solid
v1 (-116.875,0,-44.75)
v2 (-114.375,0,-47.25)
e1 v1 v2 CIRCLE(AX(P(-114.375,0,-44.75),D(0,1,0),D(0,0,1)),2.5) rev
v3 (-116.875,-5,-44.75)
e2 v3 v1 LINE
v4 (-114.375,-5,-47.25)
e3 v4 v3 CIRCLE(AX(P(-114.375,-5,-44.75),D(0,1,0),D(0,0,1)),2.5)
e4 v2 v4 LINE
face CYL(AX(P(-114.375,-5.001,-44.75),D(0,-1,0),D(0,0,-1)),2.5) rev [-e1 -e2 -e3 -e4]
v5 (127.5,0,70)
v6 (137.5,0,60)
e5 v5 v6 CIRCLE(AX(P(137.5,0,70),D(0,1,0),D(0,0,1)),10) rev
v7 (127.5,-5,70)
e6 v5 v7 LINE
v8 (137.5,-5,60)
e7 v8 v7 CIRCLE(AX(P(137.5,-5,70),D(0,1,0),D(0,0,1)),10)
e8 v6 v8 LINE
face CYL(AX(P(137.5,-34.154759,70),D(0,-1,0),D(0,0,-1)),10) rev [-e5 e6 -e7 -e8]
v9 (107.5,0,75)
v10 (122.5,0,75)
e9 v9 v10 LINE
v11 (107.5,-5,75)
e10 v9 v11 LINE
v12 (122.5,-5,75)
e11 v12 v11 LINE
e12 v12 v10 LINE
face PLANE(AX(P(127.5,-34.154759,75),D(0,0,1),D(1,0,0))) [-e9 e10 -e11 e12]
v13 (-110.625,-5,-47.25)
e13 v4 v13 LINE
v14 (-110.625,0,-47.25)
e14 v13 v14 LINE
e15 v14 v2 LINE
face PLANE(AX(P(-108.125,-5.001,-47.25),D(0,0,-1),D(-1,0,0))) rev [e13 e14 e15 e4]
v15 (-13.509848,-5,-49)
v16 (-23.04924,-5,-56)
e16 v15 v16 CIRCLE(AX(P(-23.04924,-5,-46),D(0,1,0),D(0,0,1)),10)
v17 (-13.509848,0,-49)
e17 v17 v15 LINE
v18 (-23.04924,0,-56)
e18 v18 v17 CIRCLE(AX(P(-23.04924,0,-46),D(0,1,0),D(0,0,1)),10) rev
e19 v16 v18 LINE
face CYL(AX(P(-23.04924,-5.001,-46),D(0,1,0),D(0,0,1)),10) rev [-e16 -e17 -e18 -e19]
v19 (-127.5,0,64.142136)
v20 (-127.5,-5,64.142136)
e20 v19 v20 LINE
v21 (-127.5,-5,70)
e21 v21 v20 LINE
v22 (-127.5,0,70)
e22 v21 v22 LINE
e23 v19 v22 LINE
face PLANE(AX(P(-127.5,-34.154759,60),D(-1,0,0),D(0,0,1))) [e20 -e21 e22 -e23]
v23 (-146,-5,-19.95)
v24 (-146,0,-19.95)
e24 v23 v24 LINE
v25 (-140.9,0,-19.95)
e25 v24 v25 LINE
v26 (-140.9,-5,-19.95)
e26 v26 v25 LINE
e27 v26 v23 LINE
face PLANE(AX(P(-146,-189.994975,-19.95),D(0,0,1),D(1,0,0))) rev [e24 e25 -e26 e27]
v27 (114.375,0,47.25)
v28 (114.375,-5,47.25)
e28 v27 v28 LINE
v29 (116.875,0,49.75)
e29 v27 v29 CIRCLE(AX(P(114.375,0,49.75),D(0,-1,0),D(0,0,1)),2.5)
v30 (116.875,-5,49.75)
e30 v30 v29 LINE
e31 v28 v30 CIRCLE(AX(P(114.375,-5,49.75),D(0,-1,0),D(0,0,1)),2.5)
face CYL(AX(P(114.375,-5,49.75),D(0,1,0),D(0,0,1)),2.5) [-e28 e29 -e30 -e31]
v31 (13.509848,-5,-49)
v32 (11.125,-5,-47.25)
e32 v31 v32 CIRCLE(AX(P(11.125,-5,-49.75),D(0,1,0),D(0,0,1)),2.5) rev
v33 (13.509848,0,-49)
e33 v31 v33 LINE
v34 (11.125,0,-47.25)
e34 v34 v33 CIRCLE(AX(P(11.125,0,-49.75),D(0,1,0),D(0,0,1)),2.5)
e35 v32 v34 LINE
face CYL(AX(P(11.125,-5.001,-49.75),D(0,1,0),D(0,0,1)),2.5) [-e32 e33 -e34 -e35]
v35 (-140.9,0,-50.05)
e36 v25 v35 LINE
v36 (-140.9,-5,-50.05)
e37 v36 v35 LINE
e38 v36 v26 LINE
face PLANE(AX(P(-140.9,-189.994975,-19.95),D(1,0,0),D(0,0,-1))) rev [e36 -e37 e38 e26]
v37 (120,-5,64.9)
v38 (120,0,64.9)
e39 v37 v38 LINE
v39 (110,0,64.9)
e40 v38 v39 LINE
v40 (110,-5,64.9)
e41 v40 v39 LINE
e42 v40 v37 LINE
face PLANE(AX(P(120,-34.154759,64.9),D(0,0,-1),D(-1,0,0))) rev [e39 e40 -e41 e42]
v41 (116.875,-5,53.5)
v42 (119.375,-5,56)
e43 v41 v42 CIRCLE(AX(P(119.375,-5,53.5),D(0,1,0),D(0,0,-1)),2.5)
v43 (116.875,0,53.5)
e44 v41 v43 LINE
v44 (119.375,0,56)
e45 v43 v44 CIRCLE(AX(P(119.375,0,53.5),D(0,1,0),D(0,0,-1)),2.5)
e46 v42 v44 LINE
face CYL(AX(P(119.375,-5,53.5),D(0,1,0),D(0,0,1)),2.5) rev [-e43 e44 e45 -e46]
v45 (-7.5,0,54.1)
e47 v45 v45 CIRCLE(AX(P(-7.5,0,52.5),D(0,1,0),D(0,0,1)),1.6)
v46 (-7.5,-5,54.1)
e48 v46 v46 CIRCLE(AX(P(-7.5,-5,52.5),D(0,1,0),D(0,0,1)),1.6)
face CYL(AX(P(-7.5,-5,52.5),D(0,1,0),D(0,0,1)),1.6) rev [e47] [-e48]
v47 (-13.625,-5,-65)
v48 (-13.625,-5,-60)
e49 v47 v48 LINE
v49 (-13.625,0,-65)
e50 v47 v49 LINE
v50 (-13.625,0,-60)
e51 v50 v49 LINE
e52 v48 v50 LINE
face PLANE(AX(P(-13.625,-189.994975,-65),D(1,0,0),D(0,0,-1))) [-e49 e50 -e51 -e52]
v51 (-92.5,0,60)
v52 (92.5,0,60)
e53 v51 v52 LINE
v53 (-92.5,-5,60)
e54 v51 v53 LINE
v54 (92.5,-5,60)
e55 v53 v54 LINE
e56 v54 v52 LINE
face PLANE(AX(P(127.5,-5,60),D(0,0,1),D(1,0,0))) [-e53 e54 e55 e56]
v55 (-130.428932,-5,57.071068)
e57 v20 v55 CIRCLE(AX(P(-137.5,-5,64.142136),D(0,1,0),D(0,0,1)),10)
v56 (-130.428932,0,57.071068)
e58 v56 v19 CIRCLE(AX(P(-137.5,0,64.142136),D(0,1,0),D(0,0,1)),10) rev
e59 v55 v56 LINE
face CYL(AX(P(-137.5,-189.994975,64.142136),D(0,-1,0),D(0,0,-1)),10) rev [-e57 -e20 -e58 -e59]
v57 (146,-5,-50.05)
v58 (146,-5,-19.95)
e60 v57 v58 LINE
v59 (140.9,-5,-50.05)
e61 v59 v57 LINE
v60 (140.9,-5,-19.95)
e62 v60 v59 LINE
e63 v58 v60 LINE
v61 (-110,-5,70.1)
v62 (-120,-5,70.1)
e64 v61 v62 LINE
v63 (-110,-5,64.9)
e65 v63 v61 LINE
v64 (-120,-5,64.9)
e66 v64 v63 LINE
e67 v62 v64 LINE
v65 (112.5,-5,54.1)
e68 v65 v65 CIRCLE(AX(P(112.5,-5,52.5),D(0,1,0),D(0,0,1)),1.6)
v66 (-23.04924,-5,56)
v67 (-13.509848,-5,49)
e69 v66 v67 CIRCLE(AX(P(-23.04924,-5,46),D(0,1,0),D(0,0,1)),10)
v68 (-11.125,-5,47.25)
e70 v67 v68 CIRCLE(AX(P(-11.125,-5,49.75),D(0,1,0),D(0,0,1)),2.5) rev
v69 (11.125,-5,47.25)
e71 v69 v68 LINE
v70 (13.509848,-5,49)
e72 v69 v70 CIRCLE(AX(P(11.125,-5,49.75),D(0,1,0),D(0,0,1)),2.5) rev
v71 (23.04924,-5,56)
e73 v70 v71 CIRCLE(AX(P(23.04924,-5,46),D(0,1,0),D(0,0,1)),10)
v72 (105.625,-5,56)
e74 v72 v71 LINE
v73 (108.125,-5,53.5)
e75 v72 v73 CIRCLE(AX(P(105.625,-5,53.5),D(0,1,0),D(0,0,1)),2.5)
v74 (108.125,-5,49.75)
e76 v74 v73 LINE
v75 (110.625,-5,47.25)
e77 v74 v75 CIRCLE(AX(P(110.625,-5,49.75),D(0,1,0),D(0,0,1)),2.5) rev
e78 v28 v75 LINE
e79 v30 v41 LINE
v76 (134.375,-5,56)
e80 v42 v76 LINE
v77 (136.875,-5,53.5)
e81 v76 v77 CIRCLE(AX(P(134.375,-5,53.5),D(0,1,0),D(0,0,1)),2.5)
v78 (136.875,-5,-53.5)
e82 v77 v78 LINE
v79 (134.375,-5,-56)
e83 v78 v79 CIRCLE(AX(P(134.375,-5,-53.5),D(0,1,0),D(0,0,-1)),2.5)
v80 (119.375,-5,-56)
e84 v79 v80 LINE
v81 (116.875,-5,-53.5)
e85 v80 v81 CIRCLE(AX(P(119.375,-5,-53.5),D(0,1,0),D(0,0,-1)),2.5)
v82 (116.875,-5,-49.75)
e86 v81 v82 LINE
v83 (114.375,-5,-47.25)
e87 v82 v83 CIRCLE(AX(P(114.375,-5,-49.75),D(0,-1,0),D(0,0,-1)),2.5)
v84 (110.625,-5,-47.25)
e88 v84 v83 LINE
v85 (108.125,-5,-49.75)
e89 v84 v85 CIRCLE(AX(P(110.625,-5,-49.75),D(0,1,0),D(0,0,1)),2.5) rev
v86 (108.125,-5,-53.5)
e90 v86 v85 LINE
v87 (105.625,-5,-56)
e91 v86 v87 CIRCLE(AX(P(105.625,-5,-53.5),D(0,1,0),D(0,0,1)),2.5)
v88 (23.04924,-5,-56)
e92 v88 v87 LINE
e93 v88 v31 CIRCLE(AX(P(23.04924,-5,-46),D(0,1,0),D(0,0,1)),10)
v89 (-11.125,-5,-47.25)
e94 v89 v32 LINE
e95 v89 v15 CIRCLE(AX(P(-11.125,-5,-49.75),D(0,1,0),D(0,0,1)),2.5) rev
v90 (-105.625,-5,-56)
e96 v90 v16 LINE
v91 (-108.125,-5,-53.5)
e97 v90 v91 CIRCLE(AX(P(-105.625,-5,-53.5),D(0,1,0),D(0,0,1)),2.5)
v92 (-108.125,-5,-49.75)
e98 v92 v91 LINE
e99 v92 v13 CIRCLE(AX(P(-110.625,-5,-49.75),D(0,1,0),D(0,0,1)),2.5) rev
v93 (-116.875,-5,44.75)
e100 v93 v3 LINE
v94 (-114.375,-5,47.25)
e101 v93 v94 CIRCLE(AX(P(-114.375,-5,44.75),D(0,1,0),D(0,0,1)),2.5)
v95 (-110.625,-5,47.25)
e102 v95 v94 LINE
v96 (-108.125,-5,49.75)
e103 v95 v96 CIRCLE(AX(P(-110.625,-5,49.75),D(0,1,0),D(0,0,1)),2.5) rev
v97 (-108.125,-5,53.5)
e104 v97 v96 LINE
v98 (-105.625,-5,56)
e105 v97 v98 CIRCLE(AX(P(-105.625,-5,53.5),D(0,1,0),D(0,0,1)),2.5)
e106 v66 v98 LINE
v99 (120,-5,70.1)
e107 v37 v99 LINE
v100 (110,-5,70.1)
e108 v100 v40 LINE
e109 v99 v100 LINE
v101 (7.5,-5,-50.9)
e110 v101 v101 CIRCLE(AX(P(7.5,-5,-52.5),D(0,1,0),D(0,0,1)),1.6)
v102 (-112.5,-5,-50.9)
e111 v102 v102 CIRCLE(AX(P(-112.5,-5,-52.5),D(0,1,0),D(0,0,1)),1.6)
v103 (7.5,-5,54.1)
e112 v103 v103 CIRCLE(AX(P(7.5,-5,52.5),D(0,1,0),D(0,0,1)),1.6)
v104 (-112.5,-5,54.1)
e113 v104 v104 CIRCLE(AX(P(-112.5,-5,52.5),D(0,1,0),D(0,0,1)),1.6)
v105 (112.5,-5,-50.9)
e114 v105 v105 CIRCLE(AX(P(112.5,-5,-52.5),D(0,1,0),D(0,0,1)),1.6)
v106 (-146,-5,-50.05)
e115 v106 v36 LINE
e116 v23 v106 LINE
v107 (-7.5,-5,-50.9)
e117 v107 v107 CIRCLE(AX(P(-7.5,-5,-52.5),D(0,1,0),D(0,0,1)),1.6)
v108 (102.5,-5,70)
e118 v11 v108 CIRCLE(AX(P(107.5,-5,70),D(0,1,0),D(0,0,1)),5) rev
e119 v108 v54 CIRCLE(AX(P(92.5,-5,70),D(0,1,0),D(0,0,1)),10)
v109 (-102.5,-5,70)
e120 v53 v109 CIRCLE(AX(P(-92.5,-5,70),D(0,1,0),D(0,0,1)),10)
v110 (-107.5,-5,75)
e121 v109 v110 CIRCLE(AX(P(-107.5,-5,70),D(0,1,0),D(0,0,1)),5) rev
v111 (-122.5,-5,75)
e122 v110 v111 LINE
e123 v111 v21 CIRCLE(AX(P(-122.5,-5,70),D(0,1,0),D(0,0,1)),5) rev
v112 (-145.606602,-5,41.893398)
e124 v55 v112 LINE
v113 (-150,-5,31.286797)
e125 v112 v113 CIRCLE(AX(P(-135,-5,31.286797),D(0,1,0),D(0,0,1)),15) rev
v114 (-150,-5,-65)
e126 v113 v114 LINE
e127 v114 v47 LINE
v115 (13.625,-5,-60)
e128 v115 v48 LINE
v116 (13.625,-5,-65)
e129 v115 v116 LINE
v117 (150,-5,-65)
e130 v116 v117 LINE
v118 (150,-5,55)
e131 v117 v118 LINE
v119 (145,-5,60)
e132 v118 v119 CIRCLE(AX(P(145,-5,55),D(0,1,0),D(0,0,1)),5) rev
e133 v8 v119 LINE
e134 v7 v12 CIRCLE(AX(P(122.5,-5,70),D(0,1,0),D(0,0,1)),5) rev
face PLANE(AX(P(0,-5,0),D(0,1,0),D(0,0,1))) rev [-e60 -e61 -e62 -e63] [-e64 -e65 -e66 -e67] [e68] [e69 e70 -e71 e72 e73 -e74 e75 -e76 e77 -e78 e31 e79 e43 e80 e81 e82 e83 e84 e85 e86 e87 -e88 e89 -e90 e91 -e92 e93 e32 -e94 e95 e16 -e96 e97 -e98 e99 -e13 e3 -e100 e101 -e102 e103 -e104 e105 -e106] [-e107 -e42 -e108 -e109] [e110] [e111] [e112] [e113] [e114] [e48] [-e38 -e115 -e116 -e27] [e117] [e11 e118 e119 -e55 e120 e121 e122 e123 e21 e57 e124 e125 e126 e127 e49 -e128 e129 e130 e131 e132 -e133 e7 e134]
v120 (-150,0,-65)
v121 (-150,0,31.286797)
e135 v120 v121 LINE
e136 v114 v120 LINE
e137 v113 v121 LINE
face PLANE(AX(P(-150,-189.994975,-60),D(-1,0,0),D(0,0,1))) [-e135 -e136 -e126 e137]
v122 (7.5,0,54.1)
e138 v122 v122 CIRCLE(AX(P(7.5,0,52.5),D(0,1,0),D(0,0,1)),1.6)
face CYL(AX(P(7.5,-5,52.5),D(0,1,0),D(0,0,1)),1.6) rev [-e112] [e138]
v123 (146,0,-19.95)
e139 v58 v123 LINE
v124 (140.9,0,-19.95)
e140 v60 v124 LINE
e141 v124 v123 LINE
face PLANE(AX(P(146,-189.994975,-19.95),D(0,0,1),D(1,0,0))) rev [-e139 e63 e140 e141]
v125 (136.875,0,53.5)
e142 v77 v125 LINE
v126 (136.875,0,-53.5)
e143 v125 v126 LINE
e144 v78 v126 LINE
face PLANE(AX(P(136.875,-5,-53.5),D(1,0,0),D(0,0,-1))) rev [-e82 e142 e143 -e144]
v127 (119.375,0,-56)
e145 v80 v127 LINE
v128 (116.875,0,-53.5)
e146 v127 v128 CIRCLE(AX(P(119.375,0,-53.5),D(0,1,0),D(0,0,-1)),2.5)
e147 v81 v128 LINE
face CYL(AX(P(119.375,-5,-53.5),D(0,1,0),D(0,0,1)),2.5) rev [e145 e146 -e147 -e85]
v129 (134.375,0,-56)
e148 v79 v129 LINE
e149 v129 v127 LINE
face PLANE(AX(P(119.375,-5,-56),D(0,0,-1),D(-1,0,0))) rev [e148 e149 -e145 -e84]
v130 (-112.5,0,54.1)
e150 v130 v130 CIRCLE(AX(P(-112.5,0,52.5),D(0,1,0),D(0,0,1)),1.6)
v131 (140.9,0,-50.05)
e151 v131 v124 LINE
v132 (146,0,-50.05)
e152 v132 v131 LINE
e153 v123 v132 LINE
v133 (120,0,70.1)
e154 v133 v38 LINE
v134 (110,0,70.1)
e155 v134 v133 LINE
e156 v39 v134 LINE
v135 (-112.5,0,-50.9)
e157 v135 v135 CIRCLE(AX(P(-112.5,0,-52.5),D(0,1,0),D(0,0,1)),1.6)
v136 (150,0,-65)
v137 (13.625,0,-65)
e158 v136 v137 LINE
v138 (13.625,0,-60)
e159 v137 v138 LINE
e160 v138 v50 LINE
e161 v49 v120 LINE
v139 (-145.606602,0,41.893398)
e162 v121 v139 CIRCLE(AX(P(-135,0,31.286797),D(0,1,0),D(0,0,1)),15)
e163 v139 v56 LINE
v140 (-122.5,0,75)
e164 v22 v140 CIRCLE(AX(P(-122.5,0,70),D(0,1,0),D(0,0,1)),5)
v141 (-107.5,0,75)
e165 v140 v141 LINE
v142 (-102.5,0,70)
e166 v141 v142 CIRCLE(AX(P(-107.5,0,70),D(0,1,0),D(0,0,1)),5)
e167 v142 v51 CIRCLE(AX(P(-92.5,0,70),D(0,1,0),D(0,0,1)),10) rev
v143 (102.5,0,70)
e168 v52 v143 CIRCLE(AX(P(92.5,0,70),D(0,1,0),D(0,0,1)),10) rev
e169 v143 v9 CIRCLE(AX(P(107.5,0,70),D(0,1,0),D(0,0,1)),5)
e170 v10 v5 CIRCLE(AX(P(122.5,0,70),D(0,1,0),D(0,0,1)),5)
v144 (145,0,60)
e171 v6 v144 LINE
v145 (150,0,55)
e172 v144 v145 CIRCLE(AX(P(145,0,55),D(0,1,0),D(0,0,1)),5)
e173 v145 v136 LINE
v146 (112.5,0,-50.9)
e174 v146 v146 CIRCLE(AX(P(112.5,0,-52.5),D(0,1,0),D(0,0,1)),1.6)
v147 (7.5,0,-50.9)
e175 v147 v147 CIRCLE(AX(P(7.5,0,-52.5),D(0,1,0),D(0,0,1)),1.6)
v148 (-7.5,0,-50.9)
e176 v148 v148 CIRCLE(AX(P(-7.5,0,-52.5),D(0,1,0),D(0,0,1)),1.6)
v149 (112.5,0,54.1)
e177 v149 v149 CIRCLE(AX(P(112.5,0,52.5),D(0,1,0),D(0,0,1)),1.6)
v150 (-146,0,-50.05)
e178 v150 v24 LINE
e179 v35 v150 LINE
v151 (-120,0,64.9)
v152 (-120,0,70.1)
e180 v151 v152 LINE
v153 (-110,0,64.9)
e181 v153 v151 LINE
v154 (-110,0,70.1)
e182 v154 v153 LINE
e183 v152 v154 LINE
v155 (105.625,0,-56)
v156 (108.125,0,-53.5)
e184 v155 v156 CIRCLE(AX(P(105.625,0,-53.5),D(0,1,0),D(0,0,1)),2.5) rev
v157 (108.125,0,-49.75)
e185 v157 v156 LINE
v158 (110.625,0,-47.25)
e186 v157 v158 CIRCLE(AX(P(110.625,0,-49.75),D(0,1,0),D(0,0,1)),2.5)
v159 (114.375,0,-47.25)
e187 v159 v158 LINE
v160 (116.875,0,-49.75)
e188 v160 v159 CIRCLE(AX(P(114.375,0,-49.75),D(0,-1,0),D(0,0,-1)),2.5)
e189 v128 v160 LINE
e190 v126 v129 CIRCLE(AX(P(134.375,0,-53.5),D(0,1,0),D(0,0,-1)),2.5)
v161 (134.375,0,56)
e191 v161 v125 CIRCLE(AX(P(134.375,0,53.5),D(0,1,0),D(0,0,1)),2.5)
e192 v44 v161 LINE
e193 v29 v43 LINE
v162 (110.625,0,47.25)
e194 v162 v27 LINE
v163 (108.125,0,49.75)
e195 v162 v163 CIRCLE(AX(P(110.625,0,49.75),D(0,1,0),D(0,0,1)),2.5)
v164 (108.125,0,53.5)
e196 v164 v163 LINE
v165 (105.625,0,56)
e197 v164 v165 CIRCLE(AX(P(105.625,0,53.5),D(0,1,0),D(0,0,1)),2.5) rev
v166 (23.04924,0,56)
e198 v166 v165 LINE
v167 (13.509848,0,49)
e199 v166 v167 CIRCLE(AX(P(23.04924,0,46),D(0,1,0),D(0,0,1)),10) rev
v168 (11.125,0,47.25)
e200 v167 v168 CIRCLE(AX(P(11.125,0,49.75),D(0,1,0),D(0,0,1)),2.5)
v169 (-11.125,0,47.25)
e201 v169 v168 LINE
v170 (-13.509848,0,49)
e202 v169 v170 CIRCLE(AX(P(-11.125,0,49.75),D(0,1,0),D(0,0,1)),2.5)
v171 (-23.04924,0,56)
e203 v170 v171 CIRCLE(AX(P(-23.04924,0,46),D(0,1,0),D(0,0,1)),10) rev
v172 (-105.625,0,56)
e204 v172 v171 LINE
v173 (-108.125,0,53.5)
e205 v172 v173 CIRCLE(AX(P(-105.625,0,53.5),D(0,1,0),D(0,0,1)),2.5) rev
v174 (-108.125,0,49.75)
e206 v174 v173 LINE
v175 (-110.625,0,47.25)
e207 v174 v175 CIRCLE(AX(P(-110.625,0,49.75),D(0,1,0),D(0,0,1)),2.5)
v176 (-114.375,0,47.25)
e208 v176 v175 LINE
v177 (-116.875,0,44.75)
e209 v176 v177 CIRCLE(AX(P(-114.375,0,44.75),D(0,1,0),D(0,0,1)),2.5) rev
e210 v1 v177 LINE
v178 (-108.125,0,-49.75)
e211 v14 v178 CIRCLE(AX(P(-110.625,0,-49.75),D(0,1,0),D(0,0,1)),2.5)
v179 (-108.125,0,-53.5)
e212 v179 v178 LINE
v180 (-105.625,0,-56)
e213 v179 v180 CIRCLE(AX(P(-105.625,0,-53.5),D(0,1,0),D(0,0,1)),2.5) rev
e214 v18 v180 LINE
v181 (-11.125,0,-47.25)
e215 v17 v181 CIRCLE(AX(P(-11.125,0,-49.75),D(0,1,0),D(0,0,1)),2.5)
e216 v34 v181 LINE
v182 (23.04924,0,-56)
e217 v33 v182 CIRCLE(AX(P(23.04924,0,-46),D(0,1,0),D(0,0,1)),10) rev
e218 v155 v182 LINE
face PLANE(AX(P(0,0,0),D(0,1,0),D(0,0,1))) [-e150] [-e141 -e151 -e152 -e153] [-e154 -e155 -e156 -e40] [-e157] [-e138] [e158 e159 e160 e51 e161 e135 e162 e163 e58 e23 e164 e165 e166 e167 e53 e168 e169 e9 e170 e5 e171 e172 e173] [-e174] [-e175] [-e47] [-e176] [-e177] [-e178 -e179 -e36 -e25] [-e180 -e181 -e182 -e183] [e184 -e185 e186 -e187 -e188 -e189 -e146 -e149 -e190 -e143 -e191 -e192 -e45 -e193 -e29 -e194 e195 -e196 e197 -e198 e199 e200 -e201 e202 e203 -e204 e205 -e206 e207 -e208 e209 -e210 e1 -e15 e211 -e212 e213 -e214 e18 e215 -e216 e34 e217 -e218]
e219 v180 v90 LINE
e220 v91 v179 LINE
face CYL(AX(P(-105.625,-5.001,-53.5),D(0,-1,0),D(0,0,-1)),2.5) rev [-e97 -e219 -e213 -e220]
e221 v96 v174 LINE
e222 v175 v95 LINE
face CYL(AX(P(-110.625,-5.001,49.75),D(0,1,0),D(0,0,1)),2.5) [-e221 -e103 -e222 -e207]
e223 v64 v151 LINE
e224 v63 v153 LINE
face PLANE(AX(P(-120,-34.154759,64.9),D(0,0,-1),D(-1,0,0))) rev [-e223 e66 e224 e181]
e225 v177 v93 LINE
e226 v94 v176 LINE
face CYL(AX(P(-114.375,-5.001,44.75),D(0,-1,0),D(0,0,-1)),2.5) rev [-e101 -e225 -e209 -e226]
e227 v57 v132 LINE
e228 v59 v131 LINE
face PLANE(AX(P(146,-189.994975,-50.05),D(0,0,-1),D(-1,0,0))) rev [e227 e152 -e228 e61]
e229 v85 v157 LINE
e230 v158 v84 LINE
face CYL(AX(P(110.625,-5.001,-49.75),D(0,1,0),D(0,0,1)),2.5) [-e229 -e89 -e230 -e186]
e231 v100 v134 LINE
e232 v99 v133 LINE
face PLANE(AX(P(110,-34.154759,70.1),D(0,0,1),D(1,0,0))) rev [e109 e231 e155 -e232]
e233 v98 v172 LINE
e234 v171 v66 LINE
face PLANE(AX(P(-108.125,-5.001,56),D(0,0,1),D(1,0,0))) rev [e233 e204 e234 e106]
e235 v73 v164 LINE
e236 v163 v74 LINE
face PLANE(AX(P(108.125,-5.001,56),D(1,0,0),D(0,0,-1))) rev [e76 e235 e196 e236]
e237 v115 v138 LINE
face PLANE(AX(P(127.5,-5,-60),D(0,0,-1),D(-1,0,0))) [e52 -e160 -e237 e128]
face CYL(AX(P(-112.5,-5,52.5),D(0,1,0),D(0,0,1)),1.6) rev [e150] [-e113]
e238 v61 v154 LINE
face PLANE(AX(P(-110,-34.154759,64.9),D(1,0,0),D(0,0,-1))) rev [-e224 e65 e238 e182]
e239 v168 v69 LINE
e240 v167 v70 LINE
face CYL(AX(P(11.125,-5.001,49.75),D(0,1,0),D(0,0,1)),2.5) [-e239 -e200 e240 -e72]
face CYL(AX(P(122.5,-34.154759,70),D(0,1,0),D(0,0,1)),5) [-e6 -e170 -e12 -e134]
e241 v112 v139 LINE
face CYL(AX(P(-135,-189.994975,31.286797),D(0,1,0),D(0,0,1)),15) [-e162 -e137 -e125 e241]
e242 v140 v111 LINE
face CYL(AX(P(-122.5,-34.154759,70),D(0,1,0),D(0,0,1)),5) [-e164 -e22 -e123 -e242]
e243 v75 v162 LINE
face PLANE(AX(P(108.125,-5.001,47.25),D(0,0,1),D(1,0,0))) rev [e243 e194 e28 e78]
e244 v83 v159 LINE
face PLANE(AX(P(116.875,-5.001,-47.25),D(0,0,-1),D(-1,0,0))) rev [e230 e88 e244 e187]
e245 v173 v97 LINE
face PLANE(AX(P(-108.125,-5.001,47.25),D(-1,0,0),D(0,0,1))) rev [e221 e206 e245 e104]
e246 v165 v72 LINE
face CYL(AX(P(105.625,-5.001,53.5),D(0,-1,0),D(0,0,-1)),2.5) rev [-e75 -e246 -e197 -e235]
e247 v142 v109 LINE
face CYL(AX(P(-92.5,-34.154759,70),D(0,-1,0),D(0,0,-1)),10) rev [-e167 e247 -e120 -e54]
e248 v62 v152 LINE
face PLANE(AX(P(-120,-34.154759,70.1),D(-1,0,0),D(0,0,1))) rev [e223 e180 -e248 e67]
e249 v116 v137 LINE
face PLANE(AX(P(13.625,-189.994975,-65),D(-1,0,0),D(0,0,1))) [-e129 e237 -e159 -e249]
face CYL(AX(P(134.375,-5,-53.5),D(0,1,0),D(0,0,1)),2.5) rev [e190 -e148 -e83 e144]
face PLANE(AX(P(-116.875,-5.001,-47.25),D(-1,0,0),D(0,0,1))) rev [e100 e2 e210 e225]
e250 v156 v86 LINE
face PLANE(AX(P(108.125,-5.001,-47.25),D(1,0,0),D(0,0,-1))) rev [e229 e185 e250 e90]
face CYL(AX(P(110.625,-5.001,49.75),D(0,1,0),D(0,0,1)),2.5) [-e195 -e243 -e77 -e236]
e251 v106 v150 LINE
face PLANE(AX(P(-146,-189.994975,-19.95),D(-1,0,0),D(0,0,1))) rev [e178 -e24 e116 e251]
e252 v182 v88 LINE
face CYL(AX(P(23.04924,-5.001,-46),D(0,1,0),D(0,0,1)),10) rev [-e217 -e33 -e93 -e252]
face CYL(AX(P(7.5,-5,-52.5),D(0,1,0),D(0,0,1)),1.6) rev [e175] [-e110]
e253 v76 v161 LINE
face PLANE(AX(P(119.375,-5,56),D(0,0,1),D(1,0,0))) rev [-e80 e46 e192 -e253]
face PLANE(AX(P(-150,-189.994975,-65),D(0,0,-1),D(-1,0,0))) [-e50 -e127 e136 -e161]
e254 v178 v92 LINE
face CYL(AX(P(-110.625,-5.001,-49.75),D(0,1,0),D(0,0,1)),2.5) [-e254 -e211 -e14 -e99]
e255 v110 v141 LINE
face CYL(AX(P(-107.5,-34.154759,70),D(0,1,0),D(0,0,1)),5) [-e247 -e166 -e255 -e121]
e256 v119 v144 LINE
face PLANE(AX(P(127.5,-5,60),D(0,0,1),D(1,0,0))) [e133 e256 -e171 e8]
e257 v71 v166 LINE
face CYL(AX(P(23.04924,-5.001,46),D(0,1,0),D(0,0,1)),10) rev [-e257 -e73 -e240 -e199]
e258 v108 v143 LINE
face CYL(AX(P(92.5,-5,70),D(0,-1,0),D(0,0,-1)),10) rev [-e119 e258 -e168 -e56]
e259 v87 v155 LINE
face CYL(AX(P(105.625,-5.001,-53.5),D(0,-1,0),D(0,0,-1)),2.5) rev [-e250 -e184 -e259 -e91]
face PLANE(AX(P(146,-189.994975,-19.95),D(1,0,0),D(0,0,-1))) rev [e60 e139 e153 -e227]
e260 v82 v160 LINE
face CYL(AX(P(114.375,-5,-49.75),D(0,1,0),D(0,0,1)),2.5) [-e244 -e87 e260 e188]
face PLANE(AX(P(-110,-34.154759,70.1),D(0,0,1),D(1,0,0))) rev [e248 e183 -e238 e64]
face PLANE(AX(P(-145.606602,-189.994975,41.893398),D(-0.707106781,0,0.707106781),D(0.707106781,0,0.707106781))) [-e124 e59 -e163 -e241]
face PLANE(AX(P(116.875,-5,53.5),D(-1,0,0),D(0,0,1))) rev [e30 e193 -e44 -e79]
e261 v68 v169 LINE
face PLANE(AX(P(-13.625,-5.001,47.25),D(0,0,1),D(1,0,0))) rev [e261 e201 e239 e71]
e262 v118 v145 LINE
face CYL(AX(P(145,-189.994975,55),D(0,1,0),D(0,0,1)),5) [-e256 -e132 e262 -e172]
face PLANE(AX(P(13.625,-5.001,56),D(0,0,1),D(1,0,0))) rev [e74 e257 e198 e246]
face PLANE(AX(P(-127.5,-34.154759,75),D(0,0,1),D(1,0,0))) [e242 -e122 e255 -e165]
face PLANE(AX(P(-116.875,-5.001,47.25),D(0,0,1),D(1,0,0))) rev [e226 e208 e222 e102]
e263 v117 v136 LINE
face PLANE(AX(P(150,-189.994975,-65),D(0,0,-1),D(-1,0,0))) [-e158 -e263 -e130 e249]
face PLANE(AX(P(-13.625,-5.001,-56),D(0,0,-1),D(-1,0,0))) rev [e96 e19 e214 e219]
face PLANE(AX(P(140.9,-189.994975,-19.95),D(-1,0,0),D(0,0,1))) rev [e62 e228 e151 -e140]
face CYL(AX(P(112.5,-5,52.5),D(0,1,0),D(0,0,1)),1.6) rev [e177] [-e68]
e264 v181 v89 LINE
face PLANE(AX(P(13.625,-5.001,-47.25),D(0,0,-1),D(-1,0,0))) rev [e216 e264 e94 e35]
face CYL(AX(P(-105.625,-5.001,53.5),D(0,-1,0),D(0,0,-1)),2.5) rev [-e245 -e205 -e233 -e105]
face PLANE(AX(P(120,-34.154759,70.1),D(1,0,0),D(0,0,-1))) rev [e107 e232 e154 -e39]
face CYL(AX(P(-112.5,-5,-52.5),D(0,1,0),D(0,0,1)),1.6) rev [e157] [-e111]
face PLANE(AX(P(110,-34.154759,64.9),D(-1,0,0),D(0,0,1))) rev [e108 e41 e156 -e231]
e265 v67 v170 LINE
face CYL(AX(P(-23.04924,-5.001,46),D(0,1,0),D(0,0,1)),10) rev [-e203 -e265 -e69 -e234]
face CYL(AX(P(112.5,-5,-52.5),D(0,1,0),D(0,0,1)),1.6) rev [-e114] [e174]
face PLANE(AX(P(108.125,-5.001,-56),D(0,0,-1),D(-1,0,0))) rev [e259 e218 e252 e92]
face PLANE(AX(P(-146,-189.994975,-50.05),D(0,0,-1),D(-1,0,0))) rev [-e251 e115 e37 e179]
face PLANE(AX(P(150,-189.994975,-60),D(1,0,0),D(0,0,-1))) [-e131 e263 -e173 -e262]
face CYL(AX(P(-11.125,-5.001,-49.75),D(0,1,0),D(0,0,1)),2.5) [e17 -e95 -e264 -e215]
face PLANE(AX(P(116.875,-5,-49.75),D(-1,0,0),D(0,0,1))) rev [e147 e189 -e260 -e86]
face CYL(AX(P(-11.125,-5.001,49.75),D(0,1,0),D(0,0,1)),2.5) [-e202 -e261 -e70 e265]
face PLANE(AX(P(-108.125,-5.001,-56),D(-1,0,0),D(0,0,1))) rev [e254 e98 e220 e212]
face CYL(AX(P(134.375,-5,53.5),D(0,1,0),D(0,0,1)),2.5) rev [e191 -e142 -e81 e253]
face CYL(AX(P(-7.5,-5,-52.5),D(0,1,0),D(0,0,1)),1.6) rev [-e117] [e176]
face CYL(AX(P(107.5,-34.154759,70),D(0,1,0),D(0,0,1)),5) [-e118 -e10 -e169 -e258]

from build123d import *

# Parameters (mm, degrees)
SKETCH1_W           = 255
SKETCH1_H           = 120
SKETCH1_R           = 1.6
BASE_FLANGE1_DEPTH  = 5
CUT_EXTRUDE1_REACH  = 143.001
SKETCH9_W           = 5.1
SKETCH9_H           = 30.1
BOSS_EXTRUDE1_DEPTH = 5
SKETCH10_W          = 25
SKETCH10_H          = 15
SKETCH10_W_2        = 10
SKETCH10_H_2        = 5.2
BOSS_EXTRUDE2_DEPTH = 5
FILLET1_R           = 5
FILLET2_R           = 2.5
FILLET3_R           = 10
CUT_EXTRUDE2_DEPTH  = 168.779617356


# Sheet-metal steps are written as plain solids
with BuildPart() as part:
    # Sketch1 → Base-Flange1 (new body)
    with BuildSketch(Plane(origin=(0, 0, 0), x_dir=(1, 0, 0), z_dir=(0, 1, 0))):
        Rectangle(SKETCH1_W, SKETCH1_H)
        with Locations(Location((-112.5, 52.5, 0), (0, 0, 270))):
            Circle(SKETCH1_R, mode=Mode.SUBTRACT)
        with Locations(Location((-112.5, -52.5, 0), (0, 0, 270))):
            Circle(SKETCH1_R, mode=Mode.SUBTRACT)
        with Locations(Location((-7.5, -52.5, 0), (0, 0, 270))):
            Circle(SKETCH1_R, mode=Mode.SUBTRACT)
        with Locations(Location((-7.5, 52.5, 0), (0, 0, 270))):
            Circle(SKETCH1_R, mode=Mode.SUBTRACT)
        with Locations(Location((7.5, 52.5, 0), (0, 0, 270))):
            Circle(SKETCH1_R, mode=Mode.SUBTRACT)
        with Locations(Location((112.5, 52.5, 0), (0, 0, 270))):
            Circle(SKETCH1_R, mode=Mode.SUBTRACT)
        with Locations(Location((112.5, -52.5, 0), (0, 0, 270))):
            Circle(SKETCH1_R, mode=Mode.SUBTRACT)
        with Locations(Location((7.5, -52.5, 0), (0, 0, 270))):
            Circle(SKETCH1_R, mode=Mode.SUBTRACT)
    extrude(amount=-BASE_FLANGE1_DEPTH)

    # Sketch6 → Cut-Extrude1 (cut, up to next)
    with BuildSketch(Plane(origin=(0, 0, 0), x_dir=(1, 0, 0), z_dir=(0, 1, 0)), mode=Mode.PRIVATE) as cut_extrude1_sk1:
        Polygon((-108.125, 56), (-108.125, 47.25), (-116.875, 47.25), (-116.875, -47.25), (-108.125, -47.25), (-108.125, -56), (-13.625, -56), (-13.625, -47.25), (13.625, -47.25), (13.625, -56), (108.125, -56), (108.125, -47.25), (116.875, -47.25), (116.875, 47.25), (108.125, 47.25), (108.125, 56), (13.625, 56), (13.625, 47.25), (-13.625, 47.25), (-13.625, 56), align=None)
    cut_extrude1_tool1 = extrude(cut_extrude1_sk1.sketch, amount=-CUT_EXTRUDE1_REACH, mode=Mode.PRIVATE) & part.part
    add(cut_extrude1_tool1.solids().sort_by_distance((0, 0, 0))[0], mode=Mode.SUBTRACT)

    # Sketch9 → Boss-Extrude1 (add)
    # profile 1 of 2: a face of its own
    with BuildSketch(Plane(origin=(0, 0, 0), x_dir=(1, 0, 0), z_dir=(0, 1, 0))):
        with BuildLine():
            Line((-150, 60), (-150, -31.286796564))
            ThreePointArc((-150, -31.286796564), (-148.858192988, -37.02704805), (-145.606601718, -41.893398282))
            Line((-145.606601718, -41.893398282), (-127.5, -60))
            Line((-127.5, -60), (-127.5, 60))
            Line((-127.5, 60), (-13.625, 60))
            Line((-13.625, 60), (-13.625, 65))
            Line((-13.625, 65), (-150, 65))
            Line((-150, 65), (-150, 60))
        make_face()
        with Locations((-143.45, 35)):
            Rectangle(SKETCH9_W, SKETCH9_H, mode=Mode.SUBTRACT)
    # profile 2 of 2: a face of its own
    with BuildSketch(Plane(origin=(0, 0, 0), x_dir=(1, 0, 0), z_dir=(0, 1, 0))):
        with BuildLine():
            Line((127.5, 60), (127.5, -60))
            Line((127.5, -60), (145, -60))
            ThreePointArc((145, -60), (148.535533906, -58.535533906), (150, -55))
            Line((150, -55), (150, 60))
            Line((150, 60), (150, 65))
            Line((150, 65), (13.625, 65))
            Line((13.625, 65), (13.625, 60))
            Line((13.625, 60), (127.5, 60))
        make_face()
        with Locations((143.45, 35)):
            Rectangle(SKETCH9_W, SKETCH9_H, mode=Mode.SUBTRACT)
    extrude(amount=-BOSS_EXTRUDE1_DEPTH)

    # Sketch10 → Boss-Extrude2 (add)
    # profile 1 of 2: a face of its own
    with BuildSketch(Plane(origin=(0, 0, 0), x_dir=(1, 0, 0), z_dir=(0, 1, 0))):
        with Locations((115, -67.5)):
            Rectangle(SKETCH10_W, SKETCH10_H)
        with Locations((115, -67.5)):
            Rectangle(SKETCH10_W_2, SKETCH10_H_2, mode=Mode.SUBTRACT)
    # profile 2 of 2: a face of its own
    with BuildSketch(Plane(origin=(0, 0, 0), x_dir=(1, 0, 0), z_dir=(0, 1, 0))):
        with Locations((-115, -67.5)):
            Rectangle(SKETCH10_W, SKETCH10_H)
        with Locations((-115, -67.5)):
            Rectangle(SKETCH10_W_2, SKETCH10_H_2, mode=Mode.SUBTRACT)
    extrude(amount=-BOSS_EXTRUDE2_DEPTH)

    # Fillet1
    fillet1_edges = [part.edges().sort_by_distance(p)[0] for p in [
        (102.5, -2.5, 75),
        (127.5, -2.5, 75),
        (-127.5, -2.5, 75),
        (-102.5, -2.5, 75),
    ]]
    fillet(fillet1_edges, radius=FILLET1_R)

    # Fillet2
    fillet2_edges = [part.edges().sort_by_distance(p)[0] for p in [
        (-108.125, -2.5, -56),
        (-13.625, -2.5, -47.25),
        (13.625, -2.5, -47.25),
        (108.125, -2.5, -56),
        (108.125, -2.5, -47.25),
        (116.875, -2.5, -47.25),
        (116.875, -2.5, 47.25),
        (108.125, -2.5, 47.25),
        (108.125, -2.5, 56),
        (13.625, -2.5, 47.25),
        (-13.625, -2.5, 47.25),
        (-108.125, -2.5, 56),
        (-108.125, -2.5, 47.25),
        (-116.875, -2.5, 47.25),
        (-116.875, -2.5, -47.25),
        (-108.125, -2.5, -47.25),
    ]]
    fillet(fillet2_edges, radius=FILLET2_R)

    # Fillet3
    # the kernel refuses this fillet: 10 mm, written as the material it adds along each edge
    with BuildSketch(Plane(origin=(127.5, 0, 60), x_dir=(0, 0, 1), z_dir=(0, -1, 0))) as fillet3_piece_1:
        with BuildLine():
            CenterArc((FILLET3_R, -FILLET3_R), FILLET3_R, 90, 90)
            Line((0, -FILLET3_R), (0, 0))
            Line((0, 0), (FILLET3_R, 0))
        make_face()
    extrude(amount=5)
    with BuildSketch(Plane(origin=(102.5, 0, 60), x_dir=(0, 0, 1), z_dir=(0, -1, 0)), Plane(origin=(-102.5, 0, 60), x_dir=(1, 0, 0), z_dir=(0, -1, 0))) as fillet3_piece_2:
        with BuildLine():
            CenterArc((FILLET3_R, FILLET3_R), FILLET3_R, 180, 90)
            Line((0, FILLET3_R), (0, 0))
            Line((0, 0), (FILLET3_R, 0))
        make_face()
    extrude(amount=5)
    with BuildSketch(Plane(origin=(-13.625, 0, -56), x_dir=(-1, 0, 0), z_dir=(0, -1, 0))) as fillet3_piece_3:
        with BuildLine():
            CenterArc((9.424240018, -10), FILLET3_R, 90, 72.542396876)
            Line((-0.115151996, -7), (-1.069091198, -6.7))
            ThreePointArc((-1.069091198, -6.7), (-1, -6.25), (-1, 0))
            Line((-1, 0), (0, 1))
            Line((0, 1), (9.424240018, 1))
            Line((9.424240018, 1), (9.424240018, 0))
        make_face()
    extrude(amount=5)
    with BuildSketch(Plane(origin=(13.625, 0, -56), x_dir=(-0.01644805983855046, 0, 0.9998647215136394), z_dir=(0, -1, 0))) as fillet3_piece_4:
        with BuildLine():
            CenterArc((9.843636751, -9.587445719), FILLET3_R, 106.515156216, 72.542396876)
            Line((-0.155010464, -9.422965121), (-1.154875185, -9.406517061))
            Line((-1.154875185, -9.406517061), (-0.999864722, 0.01644806))
            Line((-0.999864722, 0.01644806), (0.01644806, 0.999864722))
            ThreePointArc((0.01644806, 0.999864722), (6.265602569, 0.897064348), (6.71667811, 0.958744572))
            Line((6.71667811, 0.958744572), (7.000947078, 0))
        make_face()
    extrude(amount=5)
    with BuildSketch(Plane(origin=(13.625, 0, 56), x_dir=(-0.01644805983855046, 0, -0.9998647215136394), z_dir=(0, -1, 0))) as fillet3_piece_5:
        with BuildLine():
            CenterArc((9.843636751, 9.587445719), FILLET3_R, 180.942446908, 72.542396876)
            Line((-0.155010464, 9.422965121), (-1.154875185, 9.406517061))
            Line((-1.154875185, 9.406517061), (-0.999864722, -0.01644806))
            Line((-0.999864722, -0.01644806), (0.01644806, -0.999864722))
            ThreePointArc((0.01644806, -0.999864722), (6.265602569, -0.897064348), (6.71667811, -0.958744572))
            Line((6.71667811, -0.958744572), (7.000947078, 0))
        make_face()
    extrude(amount=5)
    with BuildSketch(Plane(origin=(-13.625, 0, 56), x_dir=(-1, 0, 0), z_dir=(0, -1, 0))) as fillet3_piece_6:
        with BuildLine():
            CenterArc((9.424240018, 10), FILLET3_R, 197.457603124, 72.542396876)
            Line((-0.115151996, 7), (-1.069091198, 6.7))
            ThreePointArc((-1.069091198, 6.7), (-1, 6.25), (-1, 0))
            Line((-1, 0), (0, -1))
            Line((0, -1), (9.424240018, -1))
            Line((9.424240018, -1), (9.424240018, 0))
        make_face()
    extrude(amount=5)
    with BuildSketch(Plane(origin=(-127.5, 0, 60), x_dir=(0, 0, 1), z_dir=(0, -1, 0))) as fillet3_piece_7:
        with BuildLine():
            CenterArc((FILLET3_R * 0.414213562373, FILLET3_R), FILLET3_R, 225, 45)
            Line((-FILLET3_R * 0.292893218813, FILLET3_R * 0.292893218813), (0, 0))
            Line((0, 0), (FILLET3_R * 0.414213562373, 0))
        make_face()
    extrude(amount=5)

    # Sketch11 → Cut-Extrude2 (cut, through all)
    with BuildSketch(Plane(origin=(0, 0, 0), x_dir=(1, 0, 0), z_dir=(0, 1, 0))):
        with BuildLine():
            Line((116.875, 49.75), (116.875, 53.5))
            ThreePointArc((116.875, 53.5), (117.607233047, 55.267766953), (119.375, 56))
            Line((119.375, 56), (134.375, 56))
            ThreePointArc((134.375, 56), (136.142766953, 55.267766953), (136.875, 53.5))
            Line((136.875, 53.5), (136.875, -53.5))
            ThreePointArc((136.875, -53.5), (136.142766953, -55.267766953), (134.375, -56))
            Line((134.375, -56), (119.375, -56))
            ThreePointArc((119.375, -56), (117.607233047, -55.267766953), (116.875, -53.5))
            Line((116.875, -53.5), (116.875, -49.75))
            ThreePointArc((116.875, -49.75), (116.142766953, -47.982233047), (114.375, -47.25))
            ThreePointArc((114.375, -47.25), (116.142766953, -46.517766953), (116.875, -44.75))
            Line((116.875, -44.75), (116.875, 44.75))
            ThreePointArc((116.875, 44.75), (116.142766953, 46.517766953), (114.375, 47.25))
            ThreePointArc((114.375, 47.25), (116.142766953, 47.982233047), (116.875, 49.75))
        make_face()
    extrude(amount=-CUT_EXTRUDE2_DEPTH, mode=Mode.SUBTRACT)


solid = part.part
